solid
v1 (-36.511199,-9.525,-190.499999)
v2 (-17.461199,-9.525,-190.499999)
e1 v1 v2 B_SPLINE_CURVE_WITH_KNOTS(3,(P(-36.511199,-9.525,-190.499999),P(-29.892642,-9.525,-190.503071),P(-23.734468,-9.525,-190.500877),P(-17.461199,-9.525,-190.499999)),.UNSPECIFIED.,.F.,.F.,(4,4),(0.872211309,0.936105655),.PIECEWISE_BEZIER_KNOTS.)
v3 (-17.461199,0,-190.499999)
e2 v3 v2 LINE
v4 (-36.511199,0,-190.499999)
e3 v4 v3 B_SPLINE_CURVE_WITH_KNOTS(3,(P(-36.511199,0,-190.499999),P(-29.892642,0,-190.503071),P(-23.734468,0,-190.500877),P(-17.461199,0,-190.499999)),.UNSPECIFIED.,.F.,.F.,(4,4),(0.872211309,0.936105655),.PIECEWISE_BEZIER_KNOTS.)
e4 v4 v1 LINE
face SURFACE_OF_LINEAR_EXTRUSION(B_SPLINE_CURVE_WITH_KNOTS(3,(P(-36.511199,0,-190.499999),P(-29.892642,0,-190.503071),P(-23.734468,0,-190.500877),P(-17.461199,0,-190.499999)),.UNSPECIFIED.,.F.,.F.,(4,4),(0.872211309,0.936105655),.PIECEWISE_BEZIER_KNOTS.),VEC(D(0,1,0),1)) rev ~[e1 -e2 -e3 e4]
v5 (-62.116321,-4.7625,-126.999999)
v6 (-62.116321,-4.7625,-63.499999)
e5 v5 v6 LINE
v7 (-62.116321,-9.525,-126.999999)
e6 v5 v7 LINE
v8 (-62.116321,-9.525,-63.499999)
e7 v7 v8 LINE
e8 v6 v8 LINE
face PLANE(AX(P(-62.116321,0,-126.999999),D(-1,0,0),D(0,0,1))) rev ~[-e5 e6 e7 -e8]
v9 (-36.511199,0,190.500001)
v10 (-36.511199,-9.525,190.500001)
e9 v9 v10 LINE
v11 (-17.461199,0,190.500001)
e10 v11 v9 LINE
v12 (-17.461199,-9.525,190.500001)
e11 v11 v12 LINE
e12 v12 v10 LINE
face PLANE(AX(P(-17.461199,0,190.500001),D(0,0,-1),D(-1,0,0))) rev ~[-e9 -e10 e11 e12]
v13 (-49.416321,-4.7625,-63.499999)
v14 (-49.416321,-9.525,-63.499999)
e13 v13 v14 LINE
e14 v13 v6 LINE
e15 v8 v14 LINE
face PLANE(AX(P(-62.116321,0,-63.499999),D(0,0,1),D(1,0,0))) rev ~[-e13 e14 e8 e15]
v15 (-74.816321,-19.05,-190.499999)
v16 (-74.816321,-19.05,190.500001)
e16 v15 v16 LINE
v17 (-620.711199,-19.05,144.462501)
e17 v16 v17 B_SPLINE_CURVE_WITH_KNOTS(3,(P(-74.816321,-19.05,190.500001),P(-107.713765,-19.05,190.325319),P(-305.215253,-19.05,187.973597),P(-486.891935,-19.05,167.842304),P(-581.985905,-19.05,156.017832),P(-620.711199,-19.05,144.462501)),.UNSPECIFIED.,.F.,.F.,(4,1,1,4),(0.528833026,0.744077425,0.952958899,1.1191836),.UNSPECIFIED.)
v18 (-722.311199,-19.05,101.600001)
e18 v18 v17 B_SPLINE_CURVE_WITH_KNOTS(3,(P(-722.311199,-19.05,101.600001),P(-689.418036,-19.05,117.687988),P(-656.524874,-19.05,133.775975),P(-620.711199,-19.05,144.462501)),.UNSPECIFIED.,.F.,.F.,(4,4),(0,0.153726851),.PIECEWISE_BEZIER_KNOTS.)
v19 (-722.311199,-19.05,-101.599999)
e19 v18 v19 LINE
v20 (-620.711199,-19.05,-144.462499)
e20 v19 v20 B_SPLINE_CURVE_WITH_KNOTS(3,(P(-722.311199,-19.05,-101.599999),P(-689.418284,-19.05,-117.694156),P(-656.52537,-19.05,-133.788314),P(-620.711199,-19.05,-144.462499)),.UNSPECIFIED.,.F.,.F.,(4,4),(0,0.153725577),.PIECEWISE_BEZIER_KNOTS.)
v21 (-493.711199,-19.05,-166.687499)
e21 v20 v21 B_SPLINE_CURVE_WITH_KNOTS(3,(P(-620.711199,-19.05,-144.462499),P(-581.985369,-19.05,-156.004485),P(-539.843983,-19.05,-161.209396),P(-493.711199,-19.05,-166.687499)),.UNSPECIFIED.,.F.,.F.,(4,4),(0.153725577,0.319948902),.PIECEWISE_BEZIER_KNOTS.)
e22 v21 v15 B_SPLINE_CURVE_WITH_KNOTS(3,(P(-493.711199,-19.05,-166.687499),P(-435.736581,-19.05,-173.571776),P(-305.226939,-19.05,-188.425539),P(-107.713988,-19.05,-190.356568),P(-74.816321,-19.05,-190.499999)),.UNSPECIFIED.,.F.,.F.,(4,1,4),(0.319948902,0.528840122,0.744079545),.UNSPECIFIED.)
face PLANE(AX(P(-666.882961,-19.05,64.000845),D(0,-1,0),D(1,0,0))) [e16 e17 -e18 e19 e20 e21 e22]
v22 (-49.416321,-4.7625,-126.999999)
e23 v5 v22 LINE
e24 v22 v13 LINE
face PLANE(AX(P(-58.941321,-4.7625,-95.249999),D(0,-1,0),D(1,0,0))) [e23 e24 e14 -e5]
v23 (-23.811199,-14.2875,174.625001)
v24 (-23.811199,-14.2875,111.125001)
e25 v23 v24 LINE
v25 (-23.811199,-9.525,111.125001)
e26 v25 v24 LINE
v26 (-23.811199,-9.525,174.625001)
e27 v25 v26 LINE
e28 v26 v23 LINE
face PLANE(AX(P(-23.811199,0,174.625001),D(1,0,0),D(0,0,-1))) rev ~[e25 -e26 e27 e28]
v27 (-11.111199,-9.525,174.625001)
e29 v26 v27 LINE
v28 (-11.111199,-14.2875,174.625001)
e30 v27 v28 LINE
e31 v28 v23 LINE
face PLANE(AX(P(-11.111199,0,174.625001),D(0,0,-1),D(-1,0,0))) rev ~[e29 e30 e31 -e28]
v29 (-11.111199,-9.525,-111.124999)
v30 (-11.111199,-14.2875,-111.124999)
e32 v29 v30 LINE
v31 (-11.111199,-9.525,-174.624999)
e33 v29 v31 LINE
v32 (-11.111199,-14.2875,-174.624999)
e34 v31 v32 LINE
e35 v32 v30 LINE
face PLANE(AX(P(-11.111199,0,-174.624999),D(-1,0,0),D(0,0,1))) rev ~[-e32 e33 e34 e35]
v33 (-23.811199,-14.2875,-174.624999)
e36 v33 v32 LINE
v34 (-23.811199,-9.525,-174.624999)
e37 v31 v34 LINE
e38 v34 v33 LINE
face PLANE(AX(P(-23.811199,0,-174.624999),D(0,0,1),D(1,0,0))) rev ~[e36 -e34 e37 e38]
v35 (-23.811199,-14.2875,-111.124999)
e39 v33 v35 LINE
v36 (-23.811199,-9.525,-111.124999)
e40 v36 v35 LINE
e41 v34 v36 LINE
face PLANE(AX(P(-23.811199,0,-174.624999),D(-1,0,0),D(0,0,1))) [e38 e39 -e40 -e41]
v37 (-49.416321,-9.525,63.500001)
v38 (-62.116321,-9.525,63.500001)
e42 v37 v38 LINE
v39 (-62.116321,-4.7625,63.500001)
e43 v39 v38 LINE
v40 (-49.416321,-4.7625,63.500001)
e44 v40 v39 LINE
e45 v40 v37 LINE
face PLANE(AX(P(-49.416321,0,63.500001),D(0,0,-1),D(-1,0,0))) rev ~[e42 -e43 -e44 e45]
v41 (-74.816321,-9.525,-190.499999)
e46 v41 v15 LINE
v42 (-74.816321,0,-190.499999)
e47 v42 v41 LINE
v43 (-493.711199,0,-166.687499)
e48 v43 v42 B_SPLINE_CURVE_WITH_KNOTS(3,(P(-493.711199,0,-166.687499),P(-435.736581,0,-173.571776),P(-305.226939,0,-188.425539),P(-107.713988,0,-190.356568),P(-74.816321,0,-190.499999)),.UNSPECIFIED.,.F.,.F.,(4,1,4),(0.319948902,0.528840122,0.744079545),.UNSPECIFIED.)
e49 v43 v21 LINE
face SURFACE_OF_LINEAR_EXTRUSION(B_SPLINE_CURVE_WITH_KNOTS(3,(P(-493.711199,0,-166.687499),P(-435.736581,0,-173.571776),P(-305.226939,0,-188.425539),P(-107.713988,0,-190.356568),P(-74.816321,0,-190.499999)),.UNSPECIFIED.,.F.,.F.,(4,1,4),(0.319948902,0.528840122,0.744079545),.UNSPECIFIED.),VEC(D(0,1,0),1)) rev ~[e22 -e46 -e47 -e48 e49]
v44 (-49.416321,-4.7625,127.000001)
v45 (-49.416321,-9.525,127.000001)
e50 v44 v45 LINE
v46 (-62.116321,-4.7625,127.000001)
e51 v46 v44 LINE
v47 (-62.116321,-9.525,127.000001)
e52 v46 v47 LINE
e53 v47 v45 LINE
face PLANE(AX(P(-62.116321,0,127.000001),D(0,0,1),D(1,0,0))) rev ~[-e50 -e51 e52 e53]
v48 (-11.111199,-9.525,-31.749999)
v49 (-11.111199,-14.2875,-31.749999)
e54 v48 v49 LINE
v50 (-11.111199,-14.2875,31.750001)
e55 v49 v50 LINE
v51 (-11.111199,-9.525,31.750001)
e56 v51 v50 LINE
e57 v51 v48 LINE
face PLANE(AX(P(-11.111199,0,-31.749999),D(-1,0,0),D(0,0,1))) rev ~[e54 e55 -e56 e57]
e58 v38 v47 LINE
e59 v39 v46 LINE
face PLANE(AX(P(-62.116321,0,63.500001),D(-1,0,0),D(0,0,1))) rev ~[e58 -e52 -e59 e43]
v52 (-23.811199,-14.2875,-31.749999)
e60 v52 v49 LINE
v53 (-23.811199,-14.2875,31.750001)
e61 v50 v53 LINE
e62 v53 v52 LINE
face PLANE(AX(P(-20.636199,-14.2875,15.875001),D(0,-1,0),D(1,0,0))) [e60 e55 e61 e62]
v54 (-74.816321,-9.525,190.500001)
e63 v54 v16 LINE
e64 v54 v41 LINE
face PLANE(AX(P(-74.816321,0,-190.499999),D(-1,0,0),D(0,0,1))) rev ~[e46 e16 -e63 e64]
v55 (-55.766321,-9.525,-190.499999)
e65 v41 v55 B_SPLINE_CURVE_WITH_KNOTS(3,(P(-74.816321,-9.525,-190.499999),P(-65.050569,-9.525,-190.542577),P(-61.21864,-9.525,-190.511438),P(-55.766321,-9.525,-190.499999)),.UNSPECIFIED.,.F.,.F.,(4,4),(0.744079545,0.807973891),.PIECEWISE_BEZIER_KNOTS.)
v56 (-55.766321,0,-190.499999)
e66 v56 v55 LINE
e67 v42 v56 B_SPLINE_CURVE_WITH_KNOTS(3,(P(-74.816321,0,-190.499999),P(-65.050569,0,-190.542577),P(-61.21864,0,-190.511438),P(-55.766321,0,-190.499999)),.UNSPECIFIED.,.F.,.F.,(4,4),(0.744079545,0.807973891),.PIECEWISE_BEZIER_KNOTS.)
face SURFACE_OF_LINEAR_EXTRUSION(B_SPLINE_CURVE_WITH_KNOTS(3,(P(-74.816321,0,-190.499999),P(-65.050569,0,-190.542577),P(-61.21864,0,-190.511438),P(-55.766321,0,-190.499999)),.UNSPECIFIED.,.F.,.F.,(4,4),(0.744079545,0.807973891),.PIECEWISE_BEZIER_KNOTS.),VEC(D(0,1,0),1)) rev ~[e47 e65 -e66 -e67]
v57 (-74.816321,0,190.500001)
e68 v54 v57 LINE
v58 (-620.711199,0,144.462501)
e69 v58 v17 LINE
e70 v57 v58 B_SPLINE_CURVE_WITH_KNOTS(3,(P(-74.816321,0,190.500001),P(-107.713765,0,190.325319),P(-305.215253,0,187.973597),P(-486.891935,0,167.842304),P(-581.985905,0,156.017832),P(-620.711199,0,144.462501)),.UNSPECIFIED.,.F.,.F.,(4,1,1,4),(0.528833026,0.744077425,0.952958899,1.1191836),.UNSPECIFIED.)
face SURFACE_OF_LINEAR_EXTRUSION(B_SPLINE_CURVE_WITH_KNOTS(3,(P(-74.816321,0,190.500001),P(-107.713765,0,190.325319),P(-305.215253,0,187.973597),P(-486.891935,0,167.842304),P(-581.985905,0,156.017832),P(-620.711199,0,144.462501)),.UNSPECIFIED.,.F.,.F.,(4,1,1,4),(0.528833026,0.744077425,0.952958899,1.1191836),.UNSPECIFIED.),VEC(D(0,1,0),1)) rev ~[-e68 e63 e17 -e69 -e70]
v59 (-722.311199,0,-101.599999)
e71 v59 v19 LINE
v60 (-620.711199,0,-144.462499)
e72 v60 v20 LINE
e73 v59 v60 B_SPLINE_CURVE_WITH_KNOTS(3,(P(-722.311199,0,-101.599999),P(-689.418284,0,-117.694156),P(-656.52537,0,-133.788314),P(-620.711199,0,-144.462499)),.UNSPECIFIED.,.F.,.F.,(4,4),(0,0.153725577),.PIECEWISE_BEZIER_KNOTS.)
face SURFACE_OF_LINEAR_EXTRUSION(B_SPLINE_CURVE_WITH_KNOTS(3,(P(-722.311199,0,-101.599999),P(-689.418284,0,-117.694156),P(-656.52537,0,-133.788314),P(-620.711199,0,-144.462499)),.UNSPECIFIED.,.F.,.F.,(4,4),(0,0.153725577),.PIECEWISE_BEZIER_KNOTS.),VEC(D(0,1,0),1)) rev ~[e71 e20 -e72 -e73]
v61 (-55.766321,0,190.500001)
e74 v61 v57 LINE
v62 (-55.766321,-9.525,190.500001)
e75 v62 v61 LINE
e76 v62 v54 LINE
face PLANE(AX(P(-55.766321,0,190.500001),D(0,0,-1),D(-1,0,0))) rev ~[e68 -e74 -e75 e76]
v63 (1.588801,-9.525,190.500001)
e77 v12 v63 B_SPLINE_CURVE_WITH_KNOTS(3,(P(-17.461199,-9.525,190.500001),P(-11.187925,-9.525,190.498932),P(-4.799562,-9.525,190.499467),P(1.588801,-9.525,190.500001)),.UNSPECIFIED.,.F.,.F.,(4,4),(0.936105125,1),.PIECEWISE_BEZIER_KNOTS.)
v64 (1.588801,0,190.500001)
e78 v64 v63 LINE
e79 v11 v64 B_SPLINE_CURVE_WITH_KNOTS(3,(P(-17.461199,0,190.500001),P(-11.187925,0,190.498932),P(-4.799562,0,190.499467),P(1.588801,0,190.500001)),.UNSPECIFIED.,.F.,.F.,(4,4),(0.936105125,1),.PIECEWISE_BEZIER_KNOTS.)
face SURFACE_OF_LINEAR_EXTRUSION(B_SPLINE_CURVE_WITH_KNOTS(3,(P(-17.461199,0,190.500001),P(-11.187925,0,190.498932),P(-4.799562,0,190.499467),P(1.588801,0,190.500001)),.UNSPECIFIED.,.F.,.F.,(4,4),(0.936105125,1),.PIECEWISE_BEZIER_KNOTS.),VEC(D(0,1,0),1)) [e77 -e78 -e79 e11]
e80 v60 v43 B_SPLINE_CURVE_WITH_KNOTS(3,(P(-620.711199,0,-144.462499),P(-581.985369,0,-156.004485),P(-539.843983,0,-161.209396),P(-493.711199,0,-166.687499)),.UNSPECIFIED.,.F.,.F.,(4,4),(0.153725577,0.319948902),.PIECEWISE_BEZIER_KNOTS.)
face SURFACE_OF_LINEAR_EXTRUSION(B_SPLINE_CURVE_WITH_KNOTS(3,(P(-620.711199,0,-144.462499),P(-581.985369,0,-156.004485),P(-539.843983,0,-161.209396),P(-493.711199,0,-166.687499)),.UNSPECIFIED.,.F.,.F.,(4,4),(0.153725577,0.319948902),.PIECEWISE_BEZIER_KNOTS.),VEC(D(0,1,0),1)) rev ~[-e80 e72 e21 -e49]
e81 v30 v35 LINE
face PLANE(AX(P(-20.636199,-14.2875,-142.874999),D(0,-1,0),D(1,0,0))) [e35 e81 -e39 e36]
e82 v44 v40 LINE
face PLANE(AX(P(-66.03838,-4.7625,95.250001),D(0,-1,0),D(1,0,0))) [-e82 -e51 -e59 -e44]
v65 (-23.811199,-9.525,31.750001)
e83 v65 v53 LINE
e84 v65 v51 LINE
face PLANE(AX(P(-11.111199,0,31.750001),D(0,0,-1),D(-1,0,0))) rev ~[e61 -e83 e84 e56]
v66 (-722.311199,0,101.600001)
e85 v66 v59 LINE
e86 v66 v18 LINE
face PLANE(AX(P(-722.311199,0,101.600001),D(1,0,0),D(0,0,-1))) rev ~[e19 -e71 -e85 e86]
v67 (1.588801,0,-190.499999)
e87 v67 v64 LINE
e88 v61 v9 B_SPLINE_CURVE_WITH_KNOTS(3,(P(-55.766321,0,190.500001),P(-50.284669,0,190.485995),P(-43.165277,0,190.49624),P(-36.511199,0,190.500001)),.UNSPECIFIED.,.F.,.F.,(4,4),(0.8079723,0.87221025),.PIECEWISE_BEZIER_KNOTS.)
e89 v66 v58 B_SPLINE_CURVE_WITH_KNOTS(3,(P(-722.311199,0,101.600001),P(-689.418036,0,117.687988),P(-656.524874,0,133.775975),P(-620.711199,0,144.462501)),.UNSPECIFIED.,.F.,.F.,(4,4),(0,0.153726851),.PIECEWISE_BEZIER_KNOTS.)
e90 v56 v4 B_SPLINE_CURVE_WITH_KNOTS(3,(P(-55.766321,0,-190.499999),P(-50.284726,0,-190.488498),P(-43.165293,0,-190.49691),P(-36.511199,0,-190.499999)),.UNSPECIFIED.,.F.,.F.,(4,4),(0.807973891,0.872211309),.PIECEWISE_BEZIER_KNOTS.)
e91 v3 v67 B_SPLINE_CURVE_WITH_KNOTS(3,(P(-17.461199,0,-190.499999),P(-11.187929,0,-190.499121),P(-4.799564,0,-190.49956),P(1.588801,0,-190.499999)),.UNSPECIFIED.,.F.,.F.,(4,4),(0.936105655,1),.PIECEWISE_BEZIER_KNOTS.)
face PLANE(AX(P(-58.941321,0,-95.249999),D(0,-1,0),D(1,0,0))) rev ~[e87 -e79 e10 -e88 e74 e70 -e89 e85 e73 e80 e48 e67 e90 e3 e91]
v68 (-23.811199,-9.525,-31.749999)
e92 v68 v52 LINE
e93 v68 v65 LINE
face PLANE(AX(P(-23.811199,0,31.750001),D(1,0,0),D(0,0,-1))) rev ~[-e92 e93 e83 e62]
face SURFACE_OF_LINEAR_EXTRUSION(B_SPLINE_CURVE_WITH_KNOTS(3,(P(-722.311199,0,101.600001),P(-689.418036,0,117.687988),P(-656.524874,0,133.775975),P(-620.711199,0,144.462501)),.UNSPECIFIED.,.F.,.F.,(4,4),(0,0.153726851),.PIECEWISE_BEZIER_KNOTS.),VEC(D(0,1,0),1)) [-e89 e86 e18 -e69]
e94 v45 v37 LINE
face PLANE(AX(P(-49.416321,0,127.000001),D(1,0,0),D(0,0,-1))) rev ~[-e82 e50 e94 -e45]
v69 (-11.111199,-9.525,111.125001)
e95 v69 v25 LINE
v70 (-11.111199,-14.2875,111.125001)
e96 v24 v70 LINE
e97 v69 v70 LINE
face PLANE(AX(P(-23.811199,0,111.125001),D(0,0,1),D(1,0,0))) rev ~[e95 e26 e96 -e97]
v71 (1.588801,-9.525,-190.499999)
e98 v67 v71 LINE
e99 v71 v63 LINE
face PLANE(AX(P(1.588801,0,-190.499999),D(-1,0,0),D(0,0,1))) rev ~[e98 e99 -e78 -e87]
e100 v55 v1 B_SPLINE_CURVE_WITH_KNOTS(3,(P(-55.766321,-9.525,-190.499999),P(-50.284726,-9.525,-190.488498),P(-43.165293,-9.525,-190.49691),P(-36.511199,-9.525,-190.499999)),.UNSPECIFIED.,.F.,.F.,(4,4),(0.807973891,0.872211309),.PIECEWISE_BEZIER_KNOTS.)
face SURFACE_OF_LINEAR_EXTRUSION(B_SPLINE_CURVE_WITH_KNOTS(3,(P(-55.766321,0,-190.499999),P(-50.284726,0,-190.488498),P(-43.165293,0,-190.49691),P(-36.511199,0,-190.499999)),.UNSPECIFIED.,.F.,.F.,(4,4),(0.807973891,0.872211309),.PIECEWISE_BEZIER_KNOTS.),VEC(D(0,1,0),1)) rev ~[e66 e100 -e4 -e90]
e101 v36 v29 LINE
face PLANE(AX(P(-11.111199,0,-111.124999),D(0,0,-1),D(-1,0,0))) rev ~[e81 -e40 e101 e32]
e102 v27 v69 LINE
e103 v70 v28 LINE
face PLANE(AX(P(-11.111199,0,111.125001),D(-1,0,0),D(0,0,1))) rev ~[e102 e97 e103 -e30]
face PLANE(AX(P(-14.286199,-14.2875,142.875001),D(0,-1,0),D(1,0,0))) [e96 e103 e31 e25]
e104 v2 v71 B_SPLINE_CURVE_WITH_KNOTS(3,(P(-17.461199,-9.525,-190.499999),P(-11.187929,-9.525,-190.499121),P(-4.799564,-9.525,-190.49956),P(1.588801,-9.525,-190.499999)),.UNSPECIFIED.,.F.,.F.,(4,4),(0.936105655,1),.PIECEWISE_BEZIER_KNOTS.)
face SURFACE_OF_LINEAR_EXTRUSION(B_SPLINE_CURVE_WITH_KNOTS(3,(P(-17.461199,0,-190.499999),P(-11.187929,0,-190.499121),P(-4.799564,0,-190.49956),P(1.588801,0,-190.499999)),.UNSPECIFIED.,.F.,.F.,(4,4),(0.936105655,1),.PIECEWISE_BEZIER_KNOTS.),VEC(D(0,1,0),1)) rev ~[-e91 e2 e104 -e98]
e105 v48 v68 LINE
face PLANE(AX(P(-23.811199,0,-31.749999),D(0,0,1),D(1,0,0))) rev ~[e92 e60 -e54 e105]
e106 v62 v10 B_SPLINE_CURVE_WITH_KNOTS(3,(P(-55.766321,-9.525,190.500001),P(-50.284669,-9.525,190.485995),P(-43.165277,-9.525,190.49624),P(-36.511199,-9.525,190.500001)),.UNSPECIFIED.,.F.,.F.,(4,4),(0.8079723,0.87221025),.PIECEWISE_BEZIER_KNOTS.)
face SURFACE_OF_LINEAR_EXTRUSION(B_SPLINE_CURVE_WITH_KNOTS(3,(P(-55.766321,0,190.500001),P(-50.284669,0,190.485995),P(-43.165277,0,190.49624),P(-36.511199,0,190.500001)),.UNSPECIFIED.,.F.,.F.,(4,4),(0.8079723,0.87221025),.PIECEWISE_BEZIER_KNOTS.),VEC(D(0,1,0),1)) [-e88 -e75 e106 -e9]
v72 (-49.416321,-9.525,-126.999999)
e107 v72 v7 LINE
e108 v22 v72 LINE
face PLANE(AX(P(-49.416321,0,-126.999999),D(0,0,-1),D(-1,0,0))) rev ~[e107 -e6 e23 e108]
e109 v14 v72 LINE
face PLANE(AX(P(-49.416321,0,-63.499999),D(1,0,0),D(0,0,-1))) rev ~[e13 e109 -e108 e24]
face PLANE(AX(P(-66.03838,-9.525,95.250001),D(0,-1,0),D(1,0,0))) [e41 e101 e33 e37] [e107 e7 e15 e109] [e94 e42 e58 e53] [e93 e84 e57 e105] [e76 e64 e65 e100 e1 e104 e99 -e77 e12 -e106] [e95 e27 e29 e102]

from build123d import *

# Parameters (mm, degrees)
F1_DEPTH = 19.05
F2_DEPTH = 9.525
F0_W     = 6.35
F0_H     = 63.5
F3_DEPTH = 4.7625
F0_H_2   = 31.75
F4_DEPTH = 14.2875


with BuildPart() as f1:
    # F0 (on Front) → F1 (new body)
    with BuildSketch(Plane.XZ):
        with BuildLine():
            Line((-722.3111987114, 1.2279e-06), (-620.7111987114, 1.2279e-06))
            Line((-620.7111987114, 1.2279e-06), (-620.7111987114, 144.4625012279))
            add(Edge.make_bspline(
                [(-722.3111987114, 101.6000012279), (-689.4180363188, 117.6879881372), (-656.5248739262, 133.7759750465), (-620.7111987114, 144.4625012279)],
                knots=[0, 0, 0, 0, 0.1537268507, 0.1537268507, 0.1537268507, 0.1537268507], degree=3))
            Line((-722.3111987114, 101.6000012279), (-722.3111987114, 1.2279e-06))
        make_face()
        with BuildLine():
            Line((-620.7111987114, 1.2279e-06), (-493.7111987114, 1.2279e-06))
            Line((-493.7111987114, 1.2279e-06), (-493.7111987114, 166.6875012279))
            add(Edge.make_bspline(
                [(-620.7111987114, 144.4625012279), (-581.9859047534, 156.0178321253), (-539.8459247327, 161.2577335799), (-493.7111987114, 166.6875012279)],
                knots=[0.1537268507, 0.1537268507, 0.1537268507, 0.1537268507, 0.3199515525, 0.3199515525, 0.3199515525, 0.3199515525], degree=3))
            Line((-620.7111987114, 144.4625012279), (-620.7111987114, 1.2279e-06))
        make_face()
        with BuildLine():
            Line((-620.7111987114, -144.4624987721), (-620.7111987114, 1.2279e-06))
            Line((-620.7111987114, 1.2279e-06), (-722.3111987114, 1.2279e-06))
            Line((-722.3111987114, 1.2279e-06), (-722.3111987114, -101.5999987721))
            add(Edge.make_bspline(
                [(-722.3111987114, -101.5999987721), (-689.4182841733, -117.6941564691), (-656.5253696352, -133.7883141661), (-620.7111987114, -144.4624987721)],
                knots=[0, 0, 0, 0, 0.1537255771, 0.1537255771, 0.1537255771, 0.1537255771], degree=3))
        make_face()
        with BuildLine():
            Line((-493.7111987114, -166.6874987721), (-493.7111987114, 1.2279e-06))
            Line((-493.7111987114, 1.2279e-06), (-620.7111987114, 1.2279e-06))
            Line((-620.7111987114, 1.2279e-06), (-620.7111987114, -144.4624987721))
            add(Edge.make_bspline(
                [(-620.7111987114, -144.4624987721), (-581.9853687438, -156.0044847356), (-539.8439833334, -161.2093964589), (-493.7111987114, -166.6874987721)],
                knots=[0.1537255771, 0.1537255771, 0.1537255771, 0.1537255771, 0.3199489018, 0.3199489018, 0.3199489018, 0.3199489018], degree=3))
        make_face()
        with BuildLine():
            Line((-290.9272084468, -185.0685181572), (-290.9272084468, -0.1247681572))
            Line((-290.9272084468, -0.1247681572), (-290.9272084468, 1.2279e-06))
            Line((-290.9272084468, 1.2279e-06), (-493.7111987114, 1.2279e-06))
            Line((-493.7111987114, 1.2279e-06), (-493.7111987114, -166.6874987721))
            add(Edge.make_bspline(
                [(-493.7111987114, -166.6874987721), (-435.736581071, -173.5717761816), (-371.4584655156, -180.8874953545), (-290.9272084468, -185.0685181572)],
                knots=[0.3199489018, 0.3199489018, 0.3199489018, 0.3199489018, 0.5288401224, 0.5288401224, 0.5288401224, 0.5288401224], degree=3))
        make_face()
        with BuildLine():
            Line((-493.7111987114, 1.2279e-06), (-290.9272084468, 1.2279e-06))
            Line((-290.9272084468, 1.2279e-06), (-290.9272084468, 184.8189818428))
            add(Edge.make_bspline(
                [(-493.7111987114, 166.6875012279), (-435.7373269286, 173.5106620133), (-371.4553650094, 180.633639874), (-290.9272084468, 184.8189818428)],
                knots=[0.3199515525, 0.3199515525, 0.3199515525, 0.3199515525, 0.528833026, 0.528833026, 0.528833026, 0.528833026], degree=3))
            Line((-493.7111987114, 166.6875012279), (-493.7111987114, 1.2279e-06))
        make_face()
        with BuildLine():
            Line((-290.9272084468, 184.8189818428), (-290.9272084468, 1.2279e-06))
            Line((-290.9272084468, 1.2279e-06), (-74.8163211554, 1.2279e-06))
            Line((-74.8163211554, 1.2279e-06), (-74.8163211554, 190.5000012279))
            add(Edge.make_bspline(
                [(-290.9272084468, 184.8189818428), (-207.9460116468, 189.1318172586), (-107.7137651743, 190.3253189595), (-74.8163211554, 190.5000012279)],
                knots=[0.528833026, 0.528833026, 0.528833026, 0.528833026, 0.744077425, 0.744077425, 0.744077425, 0.744077425], degree=3))
        make_face()
        with BuildLine():
            Line((-290.9272084468, 1.2279e-06), (-290.9272084468, -0.1247681572))
            Line((-290.9272084468, -0.1247681572), (-290.9272084468, -185.0685181572))
            add(Edge.make_bspline(
                [(-290.9272084468, -185.0685181572), (-207.9486072246, -189.376602204), (-107.7139882364, -190.35656804), (-74.8163211554, -190.4999987721)],
                knots=[0.5288401224, 0.5288401224, 0.5288401224, 0.5288401224, 0.7440795453, 0.7440795453, 0.7440795453, 0.7440795453], degree=3))
            Line((-74.8163211554, -190.4999987721), (-74.8163211554, 1.2279e-06))
            Line((-74.8163211554, 1.2279e-06), (-290.9272084468, 1.2279e-06))
        make_face()
    extrude(amount=F1_DEPTH)

    # F0 (on Front) → F2 (join)
    with BuildSketch(Plane.XZ):
        Polygon((-74.8163211554, 190.5000012279), (-74.8163211554, 1.2279e-06), (-55.7663211554, 1.2279e-06), (-55.7663211554, 63.5000012279), (-62.1163211554, 63.5000012279), (-62.1163211554, 127.0000012279), (-55.7663211554, 127.0000012279), (-55.7663211554, 190.5000012279), align=None)
        with BuildLine():
            Line((-55.7663211554, 1.2279e-06), (-74.8163211554, 1.2279e-06))
            Line((-74.8163211554, 1.2279e-06), (-74.8163211554, -190.4999987721))
            add(Edge.make_bspline(
                [(-74.8163211554, -190.4999987721), (-65.0505687749, -190.5425765334), (-61.2186404836, -190.5114376797), (-55.7663211554, -190.4999987721)],
                knots=[0.7440795453, 0.7440795453, 0.7440795453, 0.7440795453, 0.8079738908, 0.8079738908, 0.8079738908, 0.8079738908], degree=3))
            Line((-55.7663211554, -190.4999987721), (-55.7663211554, -126.9999987721))
            Line((-55.7663211554, -126.9999987721), (-62.1163211554, -126.9999987721))
            Line((-62.1163211554, -126.9999987721), (-62.1163211554, -63.4999987721))
            Line((-62.1163211554, -63.4999987721), (-55.7663211554, -63.4999987721))
            Line((-55.7663211554, -63.4999987721), (-55.7663211554, 1.2279e-06))
        make_face()
        with BuildLine():
            Line((-55.7663211554, 63.5000012279), (-55.7663211554, 1.2279e-06))
            Line((-55.7663211554, 1.2279e-06), (-36.7163211554, 1.2279e-06))
            Line((-36.7163211554, 1.2279e-06), (-36.5111987114, 1.2279e-06))
            Line((-36.5111987114, 1.2279e-06), (-36.5111987114, 190.5000012279))
            add(Edge.make_bspline(
                [(-55.7663211554, 190.5000012279), (-50.284669262, 190.4859953489), (-43.1652773507, 190.4962397359), (-36.5111987114, 190.5000012279)],
                knots=[0.8079722998, 0.8079722998, 0.8079722998, 0.8079722998, 0.8722102503, 0.8722102503, 0.8722102503, 0.8722102503], degree=3))
            Line((-55.7663211554, 190.5000012279), (-55.7663211554, 127.0000012279))
            Line((-55.7663211554, 127.0000012279), (-49.4163211554, 127.0000012279))
            Line((-49.4163211554, 127.0000012279), (-49.4163211554, 63.5000012279))
            Line((-49.4163211554, 63.5000012279), (-55.7663211554, 63.5000012279))
        make_face()
        with BuildLine():
            Line((-36.7163211554, 1.2279e-06), (-55.7663211554, 1.2279e-06))
            Line((-55.7663211554, 1.2279e-06), (-55.7663211554, -63.4999987721))
            Line((-55.7663211554, -63.4999987721), (-49.4163211554, -63.4999987721))
            Line((-49.4163211554, -63.4999987721), (-49.4163211554, -126.9999987721))
            Line((-49.4163211554, -126.9999987721), (-55.7663211554, -126.9999987721))
            Line((-55.7663211554, -126.9999987721), (-55.7663211554, -190.4999987721))
            add(Edge.make_bspline(
                [(-55.7663211554, -190.4999987721), (-50.2847262742, -190.4884984448), (-43.1652926622, -190.4969101842), (-36.5111987114, -190.4999987721)],
                knots=[0.8079738908, 0.8079738908, 0.8079738908, 0.8079738908, 0.872211309, 0.872211309, 0.872211309, 0.872211309], degree=3))
            Line((-36.5111987114, -190.4999987721), (-36.5111987114, 1.2279e-06))
            Line((-36.5111987114, 1.2279e-06), (-36.7163211554, 1.2279e-06))
        make_face()
        with BuildLine():
            Line((-36.5111987114, 1.2279e-06), (-36.5111987114, -190.4999987721))
            add(Edge.make_bspline(
                [(-36.5111987114, -190.4999987721), (-29.8926422792, -190.5030708649), (-23.7344683022, -190.5008765129), (-17.4611987114, -190.4999987721)],
                knots=[0.872211309, 0.872211309, 0.872211309, 0.872211309, 0.9361056545, 0.9361056545, 0.9361056545, 0.9361056545], degree=3))
            Line((-17.4611987114, -190.4999987721), (-17.4611987114, -174.6249987721))
            Line((-17.4611987114, -174.6249987721), (-23.8111987114, -174.6249987721))
            Line((-23.8111987114, -174.6249987721), (-23.8111987114, -111.1249987721))
            Line((-23.8111987114, -111.1249987721), (-17.4611987114, -111.1249987721))
            Line((-17.4611987114, -111.1249987721), (-17.4611987114, -95.2499987721))
            Line((-17.4611987114, -95.2499987721), (-17.4611987114, -31.7499987721))
            Line((-17.4611987114, -31.7499987721), (-23.8111987114, -31.7499987721))
            Line((-23.8111987114, -31.7499987721), (-23.8111987114, 1.2279e-06))
            Line((-23.8111987114, 1.2279e-06), (-36.5111987114, 1.2279e-06))
        make_face()
        Polygon((-17.4611987114, 190.5000012279), (-36.5111987114, 190.5000012279), (-36.5111987114, 1.2279e-06), (-23.8111987114, 1.2279e-06), (-23.8111987114, 31.7500012279), (-17.4611987114, 31.7500012279), (-17.4611987114, 95.2500012279), (-17.4611987114, 111.1250012279), (-23.8111987114, 111.1250012279), (-23.8111987114, 174.6250012279), (-17.4611987114, 174.6250012279), align=None)
        with BuildLine():
            Line((-17.4611987114, -174.6249987721), (-17.4611987114, -190.4999987721))
            add(Edge.make_bspline(
                [(-17.4611987114, -190.4999987721), (-11.1879291206, -190.4991210314), (-4.799563916, -190.4995599018), (1.5888012886, -190.4999987721)],
                knots=[0.9361056545, 0.9361056545, 0.9361056545, 0.9361056545, 1, 1, 1, 1], degree=3))
            Line((1.5888012886, -190.4999987721), (1.5888012886, 1.2279e-06))
            Line((1.5888012886, 1.2279e-06), (-11.1111987114, 1.2279e-06))
            Line((-11.1111987114, 1.2279e-06), (-11.1111987114, -31.7499987721))
            Line((-11.1111987114, -31.7499987721), (-17.4611987114, -31.7499987721))
            Line((-17.4611987114, -31.7499987721), (-17.4611987114, -95.2499987721))
            Line((-17.4611987114, -95.2499987721), (-17.4611987114, -111.1249987721))
            Line((-17.4611987114, -111.1249987721), (-11.1111987114, -111.1249987721))
            Line((-11.1111987114, -111.1249987721), (-11.1111987114, -174.6249987721))
            Line((-11.1111987114, -174.6249987721), (-17.4611987114, -174.6249987721))
        make_face()
        with BuildLine():
            add(Edge.make_bspline(
                [(-17.4611987114, 190.5000012279), (-11.1879247692, 190.4989322556), (-4.7995617403, 190.4994667417), (1.5888012886, 190.5000012279)],
                knots=[0.9361051251, 0.9361051251, 0.9361051251, 0.9361051251, 1, 1, 1, 1], degree=3))
            Line((-17.4611987114, 190.5000012279), (-17.4611987114, 174.6250012279))
            Line((-17.4611987114, 174.6250012279), (-11.1111987114, 174.6250012279))
            Line((-11.1111987114, 174.6250012279), (-11.1111987114, 111.1250012279))
            Line((-11.1111987114, 111.1250012279), (-17.4611987114, 111.1250012279))
            Line((-17.4611987114, 111.1250012279), (-17.4611987114, 95.2500012279))
            Line((-17.4611987114, 95.2500012279), (-17.4611987114, 31.7500012279))
            Line((-17.4611987114, 31.7500012279), (-11.1111987114, 31.7500012279))
            Line((-11.1111987114, 31.7500012279), (-11.1111987114, 1.2279e-06))
            Line((-11.1111987114, 1.2279e-06), (1.5888012886, 1.2279e-06))
            Line((1.5888012886, 1.2279e-06), (1.5888012886, 190.5000012279))
        make_face()
        Polygon((-11.1111987114, 174.6250012279), (-17.4611987114, 174.6250012279), (-17.4611987114, 142.8750012279), (-17.4611987114, 111.1250012279), (-11.1111987114, 111.1250012279), align=None)
        Polygon((-17.4611987114, 142.8750012279), (-17.4611987114, 174.6250012279), (-23.8111987114, 174.6250012279), (-23.8111987114, 111.1250012279), (-17.4611987114, 111.1250012279), align=None)
    extrude(amount=F2_DEPTH)

    # F0 (on Front) → F3 (join)
    with BuildSketch(Plane.XZ):
        with Locations((-58.9413211554, -95.2499987721)):
            Rectangle(F0_W, F0_H)
        with Locations((-52.5913211554, -95.2499987721)):
            Rectangle(F0_W, F0_H)
        Polygon((-74.8163211554, 190.5000012279), (-74.8163211554, 1.2279e-06), (-55.7663211554, 1.2279e-06), (-55.7663211554, 63.5000012279), (-62.1163211554, 63.5000012279), (-62.1163211554, 127.0000012279), (-55.7663211554, 127.0000012279), (-55.7663211554, 190.5000012279), align=None)
        Polygon((-62.1163211554, 63.5000012279), (-55.7663211554, 63.5000012279), (-55.7663211554, 95.2500012279), (-55.7663211554, 127.0000012279), (-62.1163211554, 127.0000012279), align=None)
        with BuildLine():
            Line((-55.7663211554, 63.5000012279), (-55.7663211554, 1.2279e-06))
            Line((-55.7663211554, 1.2279e-06), (-36.7163211554, 1.2279e-06))
            Line((-36.7163211554, 1.2279e-06), (-36.5111987114, 1.2279e-06))
            Line((-36.5111987114, 1.2279e-06), (-36.5111987114, 190.5000012279))
            add(Edge.make_bspline(
                [(-55.7663211554, 190.5000012279), (-50.284669262, 190.4859953489), (-43.1652773507, 190.4962397359), (-36.5111987114, 190.5000012279)],
                knots=[0.8079722998, 0.8079722998, 0.8079722998, 0.8079722998, 0.8722102503, 0.8722102503, 0.8722102503, 0.8722102503], degree=3))
            Line((-55.7663211554, 190.5000012279), (-55.7663211554, 127.0000012279))
            Line((-55.7663211554, 127.0000012279), (-49.4163211554, 127.0000012279))
            Line((-49.4163211554, 127.0000012279), (-49.4163211554, 63.5000012279))
            Line((-49.4163211554, 63.5000012279), (-55.7663211554, 63.5000012279))
        make_face()
        Polygon((-55.7663211554, 95.2500012279), (-55.7663211554, 63.5000012279), (-49.4163211554, 63.5000012279), (-49.4163211554, 127.0000012279), (-55.7663211554, 127.0000012279), align=None)
    extrude(amount=F3_DEPTH)

    # F0 (on Front) → F4 (join)
    with BuildSketch(Plane.XZ):
        with Locations((-20.6361987114, 15.8750012279)):
            Rectangle(F0_W, F0_H_2)
        with Locations((-20.6361987114, -15.8749987721)):
            Rectangle(F0_W, F0_H_2)
        with Locations((-20.6361987114, -142.8749987721)):
            Rectangle(F0_W, F0_H)
        with Locations((-14.2861987114, -142.8749987721)):
            Rectangle(F0_W, F0_H)
        Polygon((-11.1111987114, 174.6250012279), (-17.4611987114, 174.6250012279), (-17.4611987114, 142.8750012279), (-17.4611987114, 111.1250012279), (-11.1111987114, 111.1250012279), align=None)
        Polygon((-17.4611987114, 142.8750012279), (-17.4611987114, 174.6250012279), (-23.8111987114, 174.6250012279), (-23.8111987114, 111.1250012279), (-17.4611987114, 111.1250012279), align=None)
        with Locations((-14.2861987114, 15.8750012279)):
            Rectangle(F0_W, F0_H_2)
        with Locations((-14.2861987114, -15.8749987721)):
            Rectangle(F0_W, F0_H_2)
    extrude(amount=F4_DEPTH)


solid = f1.part
